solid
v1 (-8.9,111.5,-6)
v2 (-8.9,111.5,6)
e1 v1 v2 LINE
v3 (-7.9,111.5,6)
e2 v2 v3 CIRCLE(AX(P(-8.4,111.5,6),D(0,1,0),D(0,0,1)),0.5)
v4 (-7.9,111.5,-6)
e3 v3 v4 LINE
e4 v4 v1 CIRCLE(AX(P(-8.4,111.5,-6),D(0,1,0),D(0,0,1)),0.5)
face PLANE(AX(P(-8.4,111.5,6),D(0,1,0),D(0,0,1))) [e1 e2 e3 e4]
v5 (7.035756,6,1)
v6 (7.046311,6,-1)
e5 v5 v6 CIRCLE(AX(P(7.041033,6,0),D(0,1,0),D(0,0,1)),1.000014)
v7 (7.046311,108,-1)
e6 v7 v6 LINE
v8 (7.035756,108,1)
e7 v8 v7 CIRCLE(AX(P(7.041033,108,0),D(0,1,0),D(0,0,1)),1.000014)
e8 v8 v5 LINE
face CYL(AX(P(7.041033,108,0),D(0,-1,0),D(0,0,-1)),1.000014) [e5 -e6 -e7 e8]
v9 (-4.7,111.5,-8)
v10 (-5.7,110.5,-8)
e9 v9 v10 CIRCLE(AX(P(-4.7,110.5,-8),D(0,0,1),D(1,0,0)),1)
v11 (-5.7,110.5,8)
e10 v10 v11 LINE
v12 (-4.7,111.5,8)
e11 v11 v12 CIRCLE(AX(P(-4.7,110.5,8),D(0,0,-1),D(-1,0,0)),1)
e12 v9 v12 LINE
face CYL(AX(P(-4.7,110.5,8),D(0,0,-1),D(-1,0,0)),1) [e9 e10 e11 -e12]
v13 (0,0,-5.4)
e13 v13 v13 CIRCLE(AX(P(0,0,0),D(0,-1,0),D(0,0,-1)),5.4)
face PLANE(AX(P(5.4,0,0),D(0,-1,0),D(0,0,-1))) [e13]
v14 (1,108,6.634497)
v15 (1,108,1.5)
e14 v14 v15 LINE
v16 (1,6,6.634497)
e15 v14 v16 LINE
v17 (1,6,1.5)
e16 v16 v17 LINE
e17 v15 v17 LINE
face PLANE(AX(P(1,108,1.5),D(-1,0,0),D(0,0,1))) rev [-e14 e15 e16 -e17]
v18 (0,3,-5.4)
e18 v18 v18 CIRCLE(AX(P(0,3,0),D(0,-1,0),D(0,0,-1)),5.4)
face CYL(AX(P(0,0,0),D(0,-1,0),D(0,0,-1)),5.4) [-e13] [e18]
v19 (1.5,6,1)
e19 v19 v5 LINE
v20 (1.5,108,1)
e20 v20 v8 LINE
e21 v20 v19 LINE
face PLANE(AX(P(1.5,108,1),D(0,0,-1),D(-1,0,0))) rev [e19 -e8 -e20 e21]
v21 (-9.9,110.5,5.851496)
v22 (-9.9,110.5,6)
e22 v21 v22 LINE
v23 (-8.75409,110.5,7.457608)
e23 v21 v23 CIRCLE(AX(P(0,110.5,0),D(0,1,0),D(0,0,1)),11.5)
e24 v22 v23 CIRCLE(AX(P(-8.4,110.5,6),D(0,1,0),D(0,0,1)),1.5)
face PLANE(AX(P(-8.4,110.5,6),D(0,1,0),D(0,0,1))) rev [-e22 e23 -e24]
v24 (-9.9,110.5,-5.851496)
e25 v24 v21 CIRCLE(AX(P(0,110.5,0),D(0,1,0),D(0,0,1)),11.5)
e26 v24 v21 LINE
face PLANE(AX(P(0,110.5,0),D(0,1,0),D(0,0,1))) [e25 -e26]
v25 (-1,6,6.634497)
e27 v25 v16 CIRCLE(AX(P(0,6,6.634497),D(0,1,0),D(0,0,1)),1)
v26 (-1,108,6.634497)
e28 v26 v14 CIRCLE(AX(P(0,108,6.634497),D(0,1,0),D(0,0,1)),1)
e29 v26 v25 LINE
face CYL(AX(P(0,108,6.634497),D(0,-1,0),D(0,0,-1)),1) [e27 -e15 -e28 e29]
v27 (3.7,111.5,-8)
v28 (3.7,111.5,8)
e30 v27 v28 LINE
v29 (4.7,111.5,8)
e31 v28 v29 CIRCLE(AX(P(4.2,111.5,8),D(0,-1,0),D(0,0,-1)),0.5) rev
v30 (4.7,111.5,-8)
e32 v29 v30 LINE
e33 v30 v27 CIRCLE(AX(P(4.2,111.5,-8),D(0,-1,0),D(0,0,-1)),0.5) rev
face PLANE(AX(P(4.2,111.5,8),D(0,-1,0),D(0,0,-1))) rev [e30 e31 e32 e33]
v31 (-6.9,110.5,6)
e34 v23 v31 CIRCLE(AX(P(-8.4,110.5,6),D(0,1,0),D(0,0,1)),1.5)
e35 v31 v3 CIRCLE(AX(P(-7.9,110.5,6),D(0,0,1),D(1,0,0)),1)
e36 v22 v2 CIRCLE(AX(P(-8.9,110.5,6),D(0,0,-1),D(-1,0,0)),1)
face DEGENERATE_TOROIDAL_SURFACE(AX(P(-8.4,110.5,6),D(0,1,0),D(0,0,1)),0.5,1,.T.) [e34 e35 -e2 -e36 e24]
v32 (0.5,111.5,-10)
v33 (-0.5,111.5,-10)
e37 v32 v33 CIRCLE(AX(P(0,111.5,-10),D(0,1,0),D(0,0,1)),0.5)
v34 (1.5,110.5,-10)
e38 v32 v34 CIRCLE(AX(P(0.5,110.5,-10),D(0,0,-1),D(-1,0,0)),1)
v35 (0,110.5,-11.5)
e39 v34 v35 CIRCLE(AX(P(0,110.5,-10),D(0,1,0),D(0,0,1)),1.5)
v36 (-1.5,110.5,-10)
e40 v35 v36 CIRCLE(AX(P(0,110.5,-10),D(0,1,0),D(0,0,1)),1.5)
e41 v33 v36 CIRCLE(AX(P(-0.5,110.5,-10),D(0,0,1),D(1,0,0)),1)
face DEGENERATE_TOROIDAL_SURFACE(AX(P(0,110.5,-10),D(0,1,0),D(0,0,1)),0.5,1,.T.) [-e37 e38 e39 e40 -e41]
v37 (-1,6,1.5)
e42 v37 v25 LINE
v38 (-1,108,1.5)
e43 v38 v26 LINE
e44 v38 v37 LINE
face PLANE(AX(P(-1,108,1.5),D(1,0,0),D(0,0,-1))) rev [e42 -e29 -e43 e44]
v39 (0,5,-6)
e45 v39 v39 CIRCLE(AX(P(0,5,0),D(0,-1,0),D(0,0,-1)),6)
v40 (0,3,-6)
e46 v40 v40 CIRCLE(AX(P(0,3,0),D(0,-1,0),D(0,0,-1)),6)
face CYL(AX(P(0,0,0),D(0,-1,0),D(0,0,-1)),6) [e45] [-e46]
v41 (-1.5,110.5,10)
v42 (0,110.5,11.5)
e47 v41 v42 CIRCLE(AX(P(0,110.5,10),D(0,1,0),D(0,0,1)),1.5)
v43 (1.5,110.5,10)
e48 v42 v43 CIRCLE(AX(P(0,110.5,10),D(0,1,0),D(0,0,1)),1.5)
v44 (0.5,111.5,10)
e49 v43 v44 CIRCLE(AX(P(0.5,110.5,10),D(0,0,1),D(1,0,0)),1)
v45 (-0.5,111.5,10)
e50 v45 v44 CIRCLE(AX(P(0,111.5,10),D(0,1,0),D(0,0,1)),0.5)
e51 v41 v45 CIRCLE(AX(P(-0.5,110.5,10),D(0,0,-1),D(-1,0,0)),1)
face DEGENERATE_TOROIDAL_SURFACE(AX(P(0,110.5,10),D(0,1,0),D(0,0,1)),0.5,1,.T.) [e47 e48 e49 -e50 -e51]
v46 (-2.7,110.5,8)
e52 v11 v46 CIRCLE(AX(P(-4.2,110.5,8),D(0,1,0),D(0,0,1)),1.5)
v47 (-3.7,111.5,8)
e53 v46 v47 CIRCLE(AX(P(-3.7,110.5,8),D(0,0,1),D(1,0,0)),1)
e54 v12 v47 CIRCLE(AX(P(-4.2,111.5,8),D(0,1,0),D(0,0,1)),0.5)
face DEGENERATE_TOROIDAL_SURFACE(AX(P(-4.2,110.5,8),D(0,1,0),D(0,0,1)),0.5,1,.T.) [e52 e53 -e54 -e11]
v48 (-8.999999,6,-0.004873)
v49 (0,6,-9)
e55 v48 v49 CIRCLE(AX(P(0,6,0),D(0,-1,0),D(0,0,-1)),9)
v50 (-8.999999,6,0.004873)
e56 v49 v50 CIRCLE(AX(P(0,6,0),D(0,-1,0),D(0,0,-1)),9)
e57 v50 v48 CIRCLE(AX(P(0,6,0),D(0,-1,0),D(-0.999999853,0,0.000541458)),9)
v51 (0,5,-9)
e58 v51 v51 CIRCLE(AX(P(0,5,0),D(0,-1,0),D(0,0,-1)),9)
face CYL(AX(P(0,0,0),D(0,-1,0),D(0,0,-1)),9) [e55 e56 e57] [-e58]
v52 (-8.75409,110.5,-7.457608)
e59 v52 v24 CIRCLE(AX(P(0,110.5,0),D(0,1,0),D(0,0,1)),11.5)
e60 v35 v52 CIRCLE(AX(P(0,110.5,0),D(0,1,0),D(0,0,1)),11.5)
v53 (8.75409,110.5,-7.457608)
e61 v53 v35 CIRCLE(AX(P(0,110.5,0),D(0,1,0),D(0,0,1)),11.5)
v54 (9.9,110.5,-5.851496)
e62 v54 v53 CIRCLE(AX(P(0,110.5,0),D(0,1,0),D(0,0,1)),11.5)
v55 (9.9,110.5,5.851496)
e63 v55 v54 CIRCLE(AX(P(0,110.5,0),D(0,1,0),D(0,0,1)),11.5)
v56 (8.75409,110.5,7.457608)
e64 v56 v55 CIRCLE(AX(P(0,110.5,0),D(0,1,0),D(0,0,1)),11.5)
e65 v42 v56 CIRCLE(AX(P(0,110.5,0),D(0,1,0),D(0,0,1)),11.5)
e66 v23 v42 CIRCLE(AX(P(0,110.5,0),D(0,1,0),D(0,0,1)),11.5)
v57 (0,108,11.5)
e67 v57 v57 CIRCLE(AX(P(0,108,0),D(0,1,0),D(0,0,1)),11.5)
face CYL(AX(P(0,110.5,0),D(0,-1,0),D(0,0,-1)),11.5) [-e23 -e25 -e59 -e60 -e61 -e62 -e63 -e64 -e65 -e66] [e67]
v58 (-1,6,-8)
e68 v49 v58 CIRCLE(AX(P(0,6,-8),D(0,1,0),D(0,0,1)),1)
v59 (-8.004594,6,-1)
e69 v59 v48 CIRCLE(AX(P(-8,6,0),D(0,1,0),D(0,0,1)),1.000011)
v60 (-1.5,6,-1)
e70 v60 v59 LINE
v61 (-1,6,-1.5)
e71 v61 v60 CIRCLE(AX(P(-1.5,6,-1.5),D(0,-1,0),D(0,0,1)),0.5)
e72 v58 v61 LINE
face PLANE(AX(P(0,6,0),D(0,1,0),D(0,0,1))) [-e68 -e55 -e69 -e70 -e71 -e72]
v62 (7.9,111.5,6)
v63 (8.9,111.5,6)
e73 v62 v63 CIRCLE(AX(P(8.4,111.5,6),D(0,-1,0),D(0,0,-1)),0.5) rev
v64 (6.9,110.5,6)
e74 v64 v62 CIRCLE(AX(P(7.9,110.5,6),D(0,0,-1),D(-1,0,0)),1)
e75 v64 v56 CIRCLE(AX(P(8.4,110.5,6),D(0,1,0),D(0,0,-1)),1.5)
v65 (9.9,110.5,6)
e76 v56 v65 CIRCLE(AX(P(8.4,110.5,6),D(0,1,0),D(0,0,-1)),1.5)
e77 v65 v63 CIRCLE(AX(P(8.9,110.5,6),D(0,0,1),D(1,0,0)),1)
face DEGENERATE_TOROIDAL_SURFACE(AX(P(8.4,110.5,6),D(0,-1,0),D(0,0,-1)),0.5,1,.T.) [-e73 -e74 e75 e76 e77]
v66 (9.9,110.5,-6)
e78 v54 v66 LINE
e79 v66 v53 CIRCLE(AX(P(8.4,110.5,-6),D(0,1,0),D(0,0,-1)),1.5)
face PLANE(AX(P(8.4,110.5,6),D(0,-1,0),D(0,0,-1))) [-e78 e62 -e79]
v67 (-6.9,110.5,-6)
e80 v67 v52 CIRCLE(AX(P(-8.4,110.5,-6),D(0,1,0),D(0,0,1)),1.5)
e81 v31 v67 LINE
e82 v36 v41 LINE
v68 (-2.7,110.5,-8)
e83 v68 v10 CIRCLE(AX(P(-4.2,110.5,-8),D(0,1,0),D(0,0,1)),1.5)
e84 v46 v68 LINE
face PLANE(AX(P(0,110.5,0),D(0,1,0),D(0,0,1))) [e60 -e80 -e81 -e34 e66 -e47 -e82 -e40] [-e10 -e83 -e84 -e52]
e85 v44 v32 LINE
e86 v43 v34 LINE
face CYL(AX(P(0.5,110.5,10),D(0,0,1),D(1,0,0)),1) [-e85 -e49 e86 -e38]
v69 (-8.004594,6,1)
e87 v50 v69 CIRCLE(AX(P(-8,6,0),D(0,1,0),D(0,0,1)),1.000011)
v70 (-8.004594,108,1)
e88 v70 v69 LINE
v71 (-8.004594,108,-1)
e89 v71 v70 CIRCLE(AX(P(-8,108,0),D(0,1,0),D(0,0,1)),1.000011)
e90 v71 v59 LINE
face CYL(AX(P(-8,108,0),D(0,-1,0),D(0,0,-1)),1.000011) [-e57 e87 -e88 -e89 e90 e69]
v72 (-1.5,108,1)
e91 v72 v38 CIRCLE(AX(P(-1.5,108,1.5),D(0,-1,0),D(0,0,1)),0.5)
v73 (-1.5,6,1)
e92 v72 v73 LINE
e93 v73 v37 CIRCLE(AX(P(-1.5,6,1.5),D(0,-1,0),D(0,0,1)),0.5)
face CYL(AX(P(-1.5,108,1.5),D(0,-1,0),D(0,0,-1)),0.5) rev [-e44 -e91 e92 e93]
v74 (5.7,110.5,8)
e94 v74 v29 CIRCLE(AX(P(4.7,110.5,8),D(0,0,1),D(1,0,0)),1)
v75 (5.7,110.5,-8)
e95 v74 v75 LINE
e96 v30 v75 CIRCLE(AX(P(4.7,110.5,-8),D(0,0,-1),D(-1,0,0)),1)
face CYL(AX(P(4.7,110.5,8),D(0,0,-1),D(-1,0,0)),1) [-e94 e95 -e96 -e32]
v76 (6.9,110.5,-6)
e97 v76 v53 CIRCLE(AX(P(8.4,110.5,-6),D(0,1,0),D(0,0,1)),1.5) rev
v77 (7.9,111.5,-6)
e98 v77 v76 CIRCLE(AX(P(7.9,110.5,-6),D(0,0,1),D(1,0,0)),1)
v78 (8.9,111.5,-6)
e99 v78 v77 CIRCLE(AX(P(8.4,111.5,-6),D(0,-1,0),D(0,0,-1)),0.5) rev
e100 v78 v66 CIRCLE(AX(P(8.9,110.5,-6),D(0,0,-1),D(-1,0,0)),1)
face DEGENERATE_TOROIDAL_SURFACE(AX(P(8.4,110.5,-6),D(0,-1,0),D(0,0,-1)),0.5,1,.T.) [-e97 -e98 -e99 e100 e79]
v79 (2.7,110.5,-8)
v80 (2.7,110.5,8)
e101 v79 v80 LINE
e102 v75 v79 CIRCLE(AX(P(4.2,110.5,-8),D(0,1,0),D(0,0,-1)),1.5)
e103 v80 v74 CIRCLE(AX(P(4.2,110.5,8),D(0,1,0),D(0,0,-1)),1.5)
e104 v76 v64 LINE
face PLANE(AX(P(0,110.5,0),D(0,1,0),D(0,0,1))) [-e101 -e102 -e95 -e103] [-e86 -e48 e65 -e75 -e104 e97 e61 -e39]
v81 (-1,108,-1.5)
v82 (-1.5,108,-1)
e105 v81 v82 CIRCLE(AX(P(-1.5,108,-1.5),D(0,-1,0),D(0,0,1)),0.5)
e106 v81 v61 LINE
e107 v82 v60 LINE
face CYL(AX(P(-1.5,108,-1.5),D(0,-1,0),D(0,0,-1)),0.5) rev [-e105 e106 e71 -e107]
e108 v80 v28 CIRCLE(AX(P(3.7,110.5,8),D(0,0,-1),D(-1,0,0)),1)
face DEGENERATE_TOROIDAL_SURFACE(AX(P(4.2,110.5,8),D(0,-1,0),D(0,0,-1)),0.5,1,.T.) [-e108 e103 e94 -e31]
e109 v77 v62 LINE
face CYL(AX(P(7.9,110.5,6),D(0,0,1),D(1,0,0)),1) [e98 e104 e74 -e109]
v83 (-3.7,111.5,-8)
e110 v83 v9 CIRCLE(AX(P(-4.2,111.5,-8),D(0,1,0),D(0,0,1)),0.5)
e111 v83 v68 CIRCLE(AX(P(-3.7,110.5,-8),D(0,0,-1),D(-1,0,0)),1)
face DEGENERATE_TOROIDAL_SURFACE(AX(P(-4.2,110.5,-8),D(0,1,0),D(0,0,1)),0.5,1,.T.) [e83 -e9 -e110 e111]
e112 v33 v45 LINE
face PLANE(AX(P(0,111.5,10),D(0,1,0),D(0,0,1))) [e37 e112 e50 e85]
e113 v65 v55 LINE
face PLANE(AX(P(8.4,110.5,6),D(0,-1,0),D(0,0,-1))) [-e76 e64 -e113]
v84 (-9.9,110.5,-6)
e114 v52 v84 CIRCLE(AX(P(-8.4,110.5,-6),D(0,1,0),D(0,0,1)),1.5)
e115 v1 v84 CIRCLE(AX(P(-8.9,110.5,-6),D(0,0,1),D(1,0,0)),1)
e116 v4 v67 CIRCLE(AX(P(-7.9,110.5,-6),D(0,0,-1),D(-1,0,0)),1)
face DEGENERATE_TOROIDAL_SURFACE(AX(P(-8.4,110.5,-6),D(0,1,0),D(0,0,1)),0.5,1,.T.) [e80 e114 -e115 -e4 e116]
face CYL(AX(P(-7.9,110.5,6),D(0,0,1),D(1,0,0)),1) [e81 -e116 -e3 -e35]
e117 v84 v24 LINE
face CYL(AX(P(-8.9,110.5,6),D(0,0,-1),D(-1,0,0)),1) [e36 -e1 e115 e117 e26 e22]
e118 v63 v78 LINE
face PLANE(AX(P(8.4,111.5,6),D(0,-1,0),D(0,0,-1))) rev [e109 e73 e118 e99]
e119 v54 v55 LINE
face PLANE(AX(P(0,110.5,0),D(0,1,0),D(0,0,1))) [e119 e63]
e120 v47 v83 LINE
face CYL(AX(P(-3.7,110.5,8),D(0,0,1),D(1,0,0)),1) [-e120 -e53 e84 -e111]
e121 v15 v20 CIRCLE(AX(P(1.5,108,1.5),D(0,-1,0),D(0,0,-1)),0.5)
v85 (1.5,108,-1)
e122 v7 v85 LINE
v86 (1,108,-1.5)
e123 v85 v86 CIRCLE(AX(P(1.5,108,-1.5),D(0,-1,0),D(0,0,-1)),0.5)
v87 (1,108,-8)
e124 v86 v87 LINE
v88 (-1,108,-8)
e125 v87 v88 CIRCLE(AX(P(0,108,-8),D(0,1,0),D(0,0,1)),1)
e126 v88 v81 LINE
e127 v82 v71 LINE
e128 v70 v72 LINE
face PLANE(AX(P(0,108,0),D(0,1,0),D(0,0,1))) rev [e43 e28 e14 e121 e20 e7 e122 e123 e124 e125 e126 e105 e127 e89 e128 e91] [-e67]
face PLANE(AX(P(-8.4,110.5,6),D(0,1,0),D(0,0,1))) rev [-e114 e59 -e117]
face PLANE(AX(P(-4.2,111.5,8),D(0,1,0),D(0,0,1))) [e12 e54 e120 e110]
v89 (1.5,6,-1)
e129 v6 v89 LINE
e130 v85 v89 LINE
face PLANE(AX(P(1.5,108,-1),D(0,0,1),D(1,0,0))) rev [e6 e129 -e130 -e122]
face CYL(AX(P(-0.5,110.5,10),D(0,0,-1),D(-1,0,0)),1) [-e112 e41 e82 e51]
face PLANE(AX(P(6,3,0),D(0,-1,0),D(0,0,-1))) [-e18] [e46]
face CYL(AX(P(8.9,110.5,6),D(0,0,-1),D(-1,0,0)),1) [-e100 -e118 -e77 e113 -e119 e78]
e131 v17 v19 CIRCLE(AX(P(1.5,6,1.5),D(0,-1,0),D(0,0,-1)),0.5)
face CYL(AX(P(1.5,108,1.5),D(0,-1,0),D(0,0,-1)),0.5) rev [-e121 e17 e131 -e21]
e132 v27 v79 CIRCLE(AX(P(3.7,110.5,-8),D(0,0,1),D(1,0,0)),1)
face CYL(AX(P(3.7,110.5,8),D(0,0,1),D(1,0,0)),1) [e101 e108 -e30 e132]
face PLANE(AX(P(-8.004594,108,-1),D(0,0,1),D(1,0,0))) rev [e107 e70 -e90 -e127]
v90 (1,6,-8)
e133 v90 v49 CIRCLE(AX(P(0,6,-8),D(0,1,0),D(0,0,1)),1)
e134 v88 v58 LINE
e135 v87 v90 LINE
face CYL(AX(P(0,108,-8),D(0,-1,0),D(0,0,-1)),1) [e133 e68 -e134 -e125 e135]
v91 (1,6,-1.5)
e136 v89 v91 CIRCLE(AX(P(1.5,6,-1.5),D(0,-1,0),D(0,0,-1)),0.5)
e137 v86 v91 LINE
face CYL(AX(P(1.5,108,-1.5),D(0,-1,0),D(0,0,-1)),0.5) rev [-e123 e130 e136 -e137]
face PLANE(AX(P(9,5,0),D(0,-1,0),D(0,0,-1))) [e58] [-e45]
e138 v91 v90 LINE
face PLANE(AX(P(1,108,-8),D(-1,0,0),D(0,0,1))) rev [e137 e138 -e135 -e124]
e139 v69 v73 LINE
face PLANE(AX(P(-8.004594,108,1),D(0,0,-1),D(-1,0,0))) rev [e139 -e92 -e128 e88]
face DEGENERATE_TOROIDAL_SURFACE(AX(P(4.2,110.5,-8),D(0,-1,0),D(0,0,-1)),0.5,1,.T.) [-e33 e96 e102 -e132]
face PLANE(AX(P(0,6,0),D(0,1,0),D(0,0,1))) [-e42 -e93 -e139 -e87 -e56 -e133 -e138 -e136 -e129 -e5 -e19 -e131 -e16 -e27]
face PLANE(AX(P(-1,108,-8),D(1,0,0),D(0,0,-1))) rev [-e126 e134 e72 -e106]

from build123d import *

# Parameters (mm, degrees)
BOSS_EXTRU_1_DEPTH = 102
ESQUISSE4_R        = 11.5
BOSS_EXTRU_2_DEPTH = 2.5
BOSS_EXTRU_3_DEPTH = 1
CONG_1_R           = 1


with BuildPart() as part:
    # Esquisse1 → Révolution1 (revolve)
    with BuildSketch(Plane.XY, mode=Mode.PRIVATE) as r_volution1_sk:
        Polygon((0, 0), (0, 6), (9, 6), (9, 5), (6, 5), (6, 3), (5.4, 3), (5.4, 0), align=None)
    revolve(r_volution1_sk.sketch.rotate(Axis((0, 0, 0), (0, 1, 0)), 90), axis=Axis((0, 0, 0), (0, 1, 0)))

    # Esquisse2 → Boss.-Extru.1 (add)
    with BuildSketch(Plane(origin=(0, 6, 0), x_dir=(1, 0, 0), z_dir=(0, 1, 0))):
        with BuildLine():
            Line((-8.004594421, 1), (-1.5, 1))
            ThreePointArc((-1.5, 1), (-1.146446609, 1.146446609), (-1, 1.5))
            Line((-1, 1.5), (-1, 8))
            ThreePointArc((-1, 8), (0, 9), (1, 8))
            Line((1, 8), (1, 1.5))
            ThreePointArc((1, 1.5), (1.146446609, 1.146446609), (1.5, 1))
            Line((1.5, 1), (7.046310989, 1))
            ThreePointArc((7.046310989, 1), (8.04103329, -0.005277699), (7.035755592, -1))
            Line((7.035755592, -1), (1.5, -1))
            ThreePointArc((1.5, -1), (1.146446609, -1.146446609), (1, -1.5))
            Line((1, -1.5), (1, -6.63449651))
            ThreePointArc((1, -6.63449651), (0, -7.63449651), (-1, -6.63449651))
            Line((-1, -6.63449651), (-1, -1.5))
            ThreePointArc((-1, -1.5), (-1.146446609, -1.146446609), (-1.5, -1))
            Line((-1.5, -1), (-8.004594421, -1))
            ThreePointArc((-8.004594421, -1), (-9.000010554, 0), (-8.004594421, 1))
        make_face()
    extrude(amount=BOSS_EXTRU_1_DEPTH)

    # Esquisse4 → Boss.-Extru.2 (add)
    with BuildSketch(Plane(origin=(0, 108, 0), x_dir=(1, 0, 0), z_dir=(0, 1, 0))):
        with Locations(Location((0, 0, 0), (0, 0, 270))):
            Circle(ESQUISSE4_R)
    extrude(amount=BOSS_EXTRU_2_DEPTH)

    # Esquisse5 → Boss.-Extru.3 (add)
    with BuildSketch(Plane(origin=(0, 110.5, 0), x_dir=(1, 0, 0), z_dir=(0, 1, 0))):
        with BuildLine():
            Line((-1.5, -10), (-1.5, 10))
            ThreePointArc((-1.5, 10), (0, 11.5), (1.5, 10))
            Line((1.5, 10), (1.5, -10))
            ThreePointArc((1.5, -10), (0, -11.5), (-1.5, -10))
        make_face()
        with BuildLine():
            Line((-5.7, -8), (-5.7, 8))
            ThreePointArc((-5.7, 8), (-4.2, 9.5), (-2.7, 8))
            Line((-2.7, 8), (-2.7, -8))
            ThreePointArc((-2.7, -8), (-4.2, -9.5), (-5.7, -8))
        make_face()
        with BuildLine():
            Line((-9.9, -6), (-9.9, 6))
            ThreePointArc((-9.9, 6), (-8.4, 7.5), (-6.9, 6))
            Line((-6.9, 6), (-6.9, -6))
            ThreePointArc((-6.9, -6), (-8.4, -7.5), (-9.9, -6))
        make_face()
        with BuildLine():
            Line((9.9, -6), (9.9, 6))
            ThreePointArc((9.9, 6), (8.4, 7.5), (6.9, 6))
            Line((6.9, 6), (6.9, -6))
            ThreePointArc((6.9, -6), (8.4, -7.5), (9.9, -6))
        make_face()
        with BuildLine():
            Line((5.7, -8), (5.7, 8))
            ThreePointArc((5.7, 8), (4.2, 9.5), (2.7, 8))
            Line((2.7, 8), (2.7, -8))
            ThreePointArc((2.7, -8), (4.2, -9.5), (5.7, -8))
        make_face()
    extrude(amount=BOSS_EXTRU_3_DEPTH)

    # Congé1
    cong_1_edges = [part.edges().sort_by_distance(p)[0] for p in [
        (-9.9, 111.5, 0),
        (-8.4, 111.5, -7.5),
        (-6.9, 111.5, 0),
        (-8.4, 111.5, 7.5),
        (-5.7, 111.5, 0),
        (-4.2, 111.5, -9.5),
        (-2.7, 111.5, 0),
        (-4.2, 111.5, 9.5),
        (-1.5, 111.5, 0),
        (0, 111.5, -11.5),
        (1.5, 111.5, 0),
        (0, 111.5, 11.5),
        (2.7, 111.5, 0),
        (4.2, 111.5, -9.5),
        (5.7, 111.5, 0),
        (4.2, 111.5, 9.5),
        (6.9, 111.5, 0),
        (8.4, 111.5, -7.5),
        (9.9, 111.5, 0),
        (8.4, 111.5, 7.5),
    ]]
    fillet(cong_1_edges, radius=CONG_1_R - 0.0001)  # a hair under: the kernel refuses the full size


solid = part.part
